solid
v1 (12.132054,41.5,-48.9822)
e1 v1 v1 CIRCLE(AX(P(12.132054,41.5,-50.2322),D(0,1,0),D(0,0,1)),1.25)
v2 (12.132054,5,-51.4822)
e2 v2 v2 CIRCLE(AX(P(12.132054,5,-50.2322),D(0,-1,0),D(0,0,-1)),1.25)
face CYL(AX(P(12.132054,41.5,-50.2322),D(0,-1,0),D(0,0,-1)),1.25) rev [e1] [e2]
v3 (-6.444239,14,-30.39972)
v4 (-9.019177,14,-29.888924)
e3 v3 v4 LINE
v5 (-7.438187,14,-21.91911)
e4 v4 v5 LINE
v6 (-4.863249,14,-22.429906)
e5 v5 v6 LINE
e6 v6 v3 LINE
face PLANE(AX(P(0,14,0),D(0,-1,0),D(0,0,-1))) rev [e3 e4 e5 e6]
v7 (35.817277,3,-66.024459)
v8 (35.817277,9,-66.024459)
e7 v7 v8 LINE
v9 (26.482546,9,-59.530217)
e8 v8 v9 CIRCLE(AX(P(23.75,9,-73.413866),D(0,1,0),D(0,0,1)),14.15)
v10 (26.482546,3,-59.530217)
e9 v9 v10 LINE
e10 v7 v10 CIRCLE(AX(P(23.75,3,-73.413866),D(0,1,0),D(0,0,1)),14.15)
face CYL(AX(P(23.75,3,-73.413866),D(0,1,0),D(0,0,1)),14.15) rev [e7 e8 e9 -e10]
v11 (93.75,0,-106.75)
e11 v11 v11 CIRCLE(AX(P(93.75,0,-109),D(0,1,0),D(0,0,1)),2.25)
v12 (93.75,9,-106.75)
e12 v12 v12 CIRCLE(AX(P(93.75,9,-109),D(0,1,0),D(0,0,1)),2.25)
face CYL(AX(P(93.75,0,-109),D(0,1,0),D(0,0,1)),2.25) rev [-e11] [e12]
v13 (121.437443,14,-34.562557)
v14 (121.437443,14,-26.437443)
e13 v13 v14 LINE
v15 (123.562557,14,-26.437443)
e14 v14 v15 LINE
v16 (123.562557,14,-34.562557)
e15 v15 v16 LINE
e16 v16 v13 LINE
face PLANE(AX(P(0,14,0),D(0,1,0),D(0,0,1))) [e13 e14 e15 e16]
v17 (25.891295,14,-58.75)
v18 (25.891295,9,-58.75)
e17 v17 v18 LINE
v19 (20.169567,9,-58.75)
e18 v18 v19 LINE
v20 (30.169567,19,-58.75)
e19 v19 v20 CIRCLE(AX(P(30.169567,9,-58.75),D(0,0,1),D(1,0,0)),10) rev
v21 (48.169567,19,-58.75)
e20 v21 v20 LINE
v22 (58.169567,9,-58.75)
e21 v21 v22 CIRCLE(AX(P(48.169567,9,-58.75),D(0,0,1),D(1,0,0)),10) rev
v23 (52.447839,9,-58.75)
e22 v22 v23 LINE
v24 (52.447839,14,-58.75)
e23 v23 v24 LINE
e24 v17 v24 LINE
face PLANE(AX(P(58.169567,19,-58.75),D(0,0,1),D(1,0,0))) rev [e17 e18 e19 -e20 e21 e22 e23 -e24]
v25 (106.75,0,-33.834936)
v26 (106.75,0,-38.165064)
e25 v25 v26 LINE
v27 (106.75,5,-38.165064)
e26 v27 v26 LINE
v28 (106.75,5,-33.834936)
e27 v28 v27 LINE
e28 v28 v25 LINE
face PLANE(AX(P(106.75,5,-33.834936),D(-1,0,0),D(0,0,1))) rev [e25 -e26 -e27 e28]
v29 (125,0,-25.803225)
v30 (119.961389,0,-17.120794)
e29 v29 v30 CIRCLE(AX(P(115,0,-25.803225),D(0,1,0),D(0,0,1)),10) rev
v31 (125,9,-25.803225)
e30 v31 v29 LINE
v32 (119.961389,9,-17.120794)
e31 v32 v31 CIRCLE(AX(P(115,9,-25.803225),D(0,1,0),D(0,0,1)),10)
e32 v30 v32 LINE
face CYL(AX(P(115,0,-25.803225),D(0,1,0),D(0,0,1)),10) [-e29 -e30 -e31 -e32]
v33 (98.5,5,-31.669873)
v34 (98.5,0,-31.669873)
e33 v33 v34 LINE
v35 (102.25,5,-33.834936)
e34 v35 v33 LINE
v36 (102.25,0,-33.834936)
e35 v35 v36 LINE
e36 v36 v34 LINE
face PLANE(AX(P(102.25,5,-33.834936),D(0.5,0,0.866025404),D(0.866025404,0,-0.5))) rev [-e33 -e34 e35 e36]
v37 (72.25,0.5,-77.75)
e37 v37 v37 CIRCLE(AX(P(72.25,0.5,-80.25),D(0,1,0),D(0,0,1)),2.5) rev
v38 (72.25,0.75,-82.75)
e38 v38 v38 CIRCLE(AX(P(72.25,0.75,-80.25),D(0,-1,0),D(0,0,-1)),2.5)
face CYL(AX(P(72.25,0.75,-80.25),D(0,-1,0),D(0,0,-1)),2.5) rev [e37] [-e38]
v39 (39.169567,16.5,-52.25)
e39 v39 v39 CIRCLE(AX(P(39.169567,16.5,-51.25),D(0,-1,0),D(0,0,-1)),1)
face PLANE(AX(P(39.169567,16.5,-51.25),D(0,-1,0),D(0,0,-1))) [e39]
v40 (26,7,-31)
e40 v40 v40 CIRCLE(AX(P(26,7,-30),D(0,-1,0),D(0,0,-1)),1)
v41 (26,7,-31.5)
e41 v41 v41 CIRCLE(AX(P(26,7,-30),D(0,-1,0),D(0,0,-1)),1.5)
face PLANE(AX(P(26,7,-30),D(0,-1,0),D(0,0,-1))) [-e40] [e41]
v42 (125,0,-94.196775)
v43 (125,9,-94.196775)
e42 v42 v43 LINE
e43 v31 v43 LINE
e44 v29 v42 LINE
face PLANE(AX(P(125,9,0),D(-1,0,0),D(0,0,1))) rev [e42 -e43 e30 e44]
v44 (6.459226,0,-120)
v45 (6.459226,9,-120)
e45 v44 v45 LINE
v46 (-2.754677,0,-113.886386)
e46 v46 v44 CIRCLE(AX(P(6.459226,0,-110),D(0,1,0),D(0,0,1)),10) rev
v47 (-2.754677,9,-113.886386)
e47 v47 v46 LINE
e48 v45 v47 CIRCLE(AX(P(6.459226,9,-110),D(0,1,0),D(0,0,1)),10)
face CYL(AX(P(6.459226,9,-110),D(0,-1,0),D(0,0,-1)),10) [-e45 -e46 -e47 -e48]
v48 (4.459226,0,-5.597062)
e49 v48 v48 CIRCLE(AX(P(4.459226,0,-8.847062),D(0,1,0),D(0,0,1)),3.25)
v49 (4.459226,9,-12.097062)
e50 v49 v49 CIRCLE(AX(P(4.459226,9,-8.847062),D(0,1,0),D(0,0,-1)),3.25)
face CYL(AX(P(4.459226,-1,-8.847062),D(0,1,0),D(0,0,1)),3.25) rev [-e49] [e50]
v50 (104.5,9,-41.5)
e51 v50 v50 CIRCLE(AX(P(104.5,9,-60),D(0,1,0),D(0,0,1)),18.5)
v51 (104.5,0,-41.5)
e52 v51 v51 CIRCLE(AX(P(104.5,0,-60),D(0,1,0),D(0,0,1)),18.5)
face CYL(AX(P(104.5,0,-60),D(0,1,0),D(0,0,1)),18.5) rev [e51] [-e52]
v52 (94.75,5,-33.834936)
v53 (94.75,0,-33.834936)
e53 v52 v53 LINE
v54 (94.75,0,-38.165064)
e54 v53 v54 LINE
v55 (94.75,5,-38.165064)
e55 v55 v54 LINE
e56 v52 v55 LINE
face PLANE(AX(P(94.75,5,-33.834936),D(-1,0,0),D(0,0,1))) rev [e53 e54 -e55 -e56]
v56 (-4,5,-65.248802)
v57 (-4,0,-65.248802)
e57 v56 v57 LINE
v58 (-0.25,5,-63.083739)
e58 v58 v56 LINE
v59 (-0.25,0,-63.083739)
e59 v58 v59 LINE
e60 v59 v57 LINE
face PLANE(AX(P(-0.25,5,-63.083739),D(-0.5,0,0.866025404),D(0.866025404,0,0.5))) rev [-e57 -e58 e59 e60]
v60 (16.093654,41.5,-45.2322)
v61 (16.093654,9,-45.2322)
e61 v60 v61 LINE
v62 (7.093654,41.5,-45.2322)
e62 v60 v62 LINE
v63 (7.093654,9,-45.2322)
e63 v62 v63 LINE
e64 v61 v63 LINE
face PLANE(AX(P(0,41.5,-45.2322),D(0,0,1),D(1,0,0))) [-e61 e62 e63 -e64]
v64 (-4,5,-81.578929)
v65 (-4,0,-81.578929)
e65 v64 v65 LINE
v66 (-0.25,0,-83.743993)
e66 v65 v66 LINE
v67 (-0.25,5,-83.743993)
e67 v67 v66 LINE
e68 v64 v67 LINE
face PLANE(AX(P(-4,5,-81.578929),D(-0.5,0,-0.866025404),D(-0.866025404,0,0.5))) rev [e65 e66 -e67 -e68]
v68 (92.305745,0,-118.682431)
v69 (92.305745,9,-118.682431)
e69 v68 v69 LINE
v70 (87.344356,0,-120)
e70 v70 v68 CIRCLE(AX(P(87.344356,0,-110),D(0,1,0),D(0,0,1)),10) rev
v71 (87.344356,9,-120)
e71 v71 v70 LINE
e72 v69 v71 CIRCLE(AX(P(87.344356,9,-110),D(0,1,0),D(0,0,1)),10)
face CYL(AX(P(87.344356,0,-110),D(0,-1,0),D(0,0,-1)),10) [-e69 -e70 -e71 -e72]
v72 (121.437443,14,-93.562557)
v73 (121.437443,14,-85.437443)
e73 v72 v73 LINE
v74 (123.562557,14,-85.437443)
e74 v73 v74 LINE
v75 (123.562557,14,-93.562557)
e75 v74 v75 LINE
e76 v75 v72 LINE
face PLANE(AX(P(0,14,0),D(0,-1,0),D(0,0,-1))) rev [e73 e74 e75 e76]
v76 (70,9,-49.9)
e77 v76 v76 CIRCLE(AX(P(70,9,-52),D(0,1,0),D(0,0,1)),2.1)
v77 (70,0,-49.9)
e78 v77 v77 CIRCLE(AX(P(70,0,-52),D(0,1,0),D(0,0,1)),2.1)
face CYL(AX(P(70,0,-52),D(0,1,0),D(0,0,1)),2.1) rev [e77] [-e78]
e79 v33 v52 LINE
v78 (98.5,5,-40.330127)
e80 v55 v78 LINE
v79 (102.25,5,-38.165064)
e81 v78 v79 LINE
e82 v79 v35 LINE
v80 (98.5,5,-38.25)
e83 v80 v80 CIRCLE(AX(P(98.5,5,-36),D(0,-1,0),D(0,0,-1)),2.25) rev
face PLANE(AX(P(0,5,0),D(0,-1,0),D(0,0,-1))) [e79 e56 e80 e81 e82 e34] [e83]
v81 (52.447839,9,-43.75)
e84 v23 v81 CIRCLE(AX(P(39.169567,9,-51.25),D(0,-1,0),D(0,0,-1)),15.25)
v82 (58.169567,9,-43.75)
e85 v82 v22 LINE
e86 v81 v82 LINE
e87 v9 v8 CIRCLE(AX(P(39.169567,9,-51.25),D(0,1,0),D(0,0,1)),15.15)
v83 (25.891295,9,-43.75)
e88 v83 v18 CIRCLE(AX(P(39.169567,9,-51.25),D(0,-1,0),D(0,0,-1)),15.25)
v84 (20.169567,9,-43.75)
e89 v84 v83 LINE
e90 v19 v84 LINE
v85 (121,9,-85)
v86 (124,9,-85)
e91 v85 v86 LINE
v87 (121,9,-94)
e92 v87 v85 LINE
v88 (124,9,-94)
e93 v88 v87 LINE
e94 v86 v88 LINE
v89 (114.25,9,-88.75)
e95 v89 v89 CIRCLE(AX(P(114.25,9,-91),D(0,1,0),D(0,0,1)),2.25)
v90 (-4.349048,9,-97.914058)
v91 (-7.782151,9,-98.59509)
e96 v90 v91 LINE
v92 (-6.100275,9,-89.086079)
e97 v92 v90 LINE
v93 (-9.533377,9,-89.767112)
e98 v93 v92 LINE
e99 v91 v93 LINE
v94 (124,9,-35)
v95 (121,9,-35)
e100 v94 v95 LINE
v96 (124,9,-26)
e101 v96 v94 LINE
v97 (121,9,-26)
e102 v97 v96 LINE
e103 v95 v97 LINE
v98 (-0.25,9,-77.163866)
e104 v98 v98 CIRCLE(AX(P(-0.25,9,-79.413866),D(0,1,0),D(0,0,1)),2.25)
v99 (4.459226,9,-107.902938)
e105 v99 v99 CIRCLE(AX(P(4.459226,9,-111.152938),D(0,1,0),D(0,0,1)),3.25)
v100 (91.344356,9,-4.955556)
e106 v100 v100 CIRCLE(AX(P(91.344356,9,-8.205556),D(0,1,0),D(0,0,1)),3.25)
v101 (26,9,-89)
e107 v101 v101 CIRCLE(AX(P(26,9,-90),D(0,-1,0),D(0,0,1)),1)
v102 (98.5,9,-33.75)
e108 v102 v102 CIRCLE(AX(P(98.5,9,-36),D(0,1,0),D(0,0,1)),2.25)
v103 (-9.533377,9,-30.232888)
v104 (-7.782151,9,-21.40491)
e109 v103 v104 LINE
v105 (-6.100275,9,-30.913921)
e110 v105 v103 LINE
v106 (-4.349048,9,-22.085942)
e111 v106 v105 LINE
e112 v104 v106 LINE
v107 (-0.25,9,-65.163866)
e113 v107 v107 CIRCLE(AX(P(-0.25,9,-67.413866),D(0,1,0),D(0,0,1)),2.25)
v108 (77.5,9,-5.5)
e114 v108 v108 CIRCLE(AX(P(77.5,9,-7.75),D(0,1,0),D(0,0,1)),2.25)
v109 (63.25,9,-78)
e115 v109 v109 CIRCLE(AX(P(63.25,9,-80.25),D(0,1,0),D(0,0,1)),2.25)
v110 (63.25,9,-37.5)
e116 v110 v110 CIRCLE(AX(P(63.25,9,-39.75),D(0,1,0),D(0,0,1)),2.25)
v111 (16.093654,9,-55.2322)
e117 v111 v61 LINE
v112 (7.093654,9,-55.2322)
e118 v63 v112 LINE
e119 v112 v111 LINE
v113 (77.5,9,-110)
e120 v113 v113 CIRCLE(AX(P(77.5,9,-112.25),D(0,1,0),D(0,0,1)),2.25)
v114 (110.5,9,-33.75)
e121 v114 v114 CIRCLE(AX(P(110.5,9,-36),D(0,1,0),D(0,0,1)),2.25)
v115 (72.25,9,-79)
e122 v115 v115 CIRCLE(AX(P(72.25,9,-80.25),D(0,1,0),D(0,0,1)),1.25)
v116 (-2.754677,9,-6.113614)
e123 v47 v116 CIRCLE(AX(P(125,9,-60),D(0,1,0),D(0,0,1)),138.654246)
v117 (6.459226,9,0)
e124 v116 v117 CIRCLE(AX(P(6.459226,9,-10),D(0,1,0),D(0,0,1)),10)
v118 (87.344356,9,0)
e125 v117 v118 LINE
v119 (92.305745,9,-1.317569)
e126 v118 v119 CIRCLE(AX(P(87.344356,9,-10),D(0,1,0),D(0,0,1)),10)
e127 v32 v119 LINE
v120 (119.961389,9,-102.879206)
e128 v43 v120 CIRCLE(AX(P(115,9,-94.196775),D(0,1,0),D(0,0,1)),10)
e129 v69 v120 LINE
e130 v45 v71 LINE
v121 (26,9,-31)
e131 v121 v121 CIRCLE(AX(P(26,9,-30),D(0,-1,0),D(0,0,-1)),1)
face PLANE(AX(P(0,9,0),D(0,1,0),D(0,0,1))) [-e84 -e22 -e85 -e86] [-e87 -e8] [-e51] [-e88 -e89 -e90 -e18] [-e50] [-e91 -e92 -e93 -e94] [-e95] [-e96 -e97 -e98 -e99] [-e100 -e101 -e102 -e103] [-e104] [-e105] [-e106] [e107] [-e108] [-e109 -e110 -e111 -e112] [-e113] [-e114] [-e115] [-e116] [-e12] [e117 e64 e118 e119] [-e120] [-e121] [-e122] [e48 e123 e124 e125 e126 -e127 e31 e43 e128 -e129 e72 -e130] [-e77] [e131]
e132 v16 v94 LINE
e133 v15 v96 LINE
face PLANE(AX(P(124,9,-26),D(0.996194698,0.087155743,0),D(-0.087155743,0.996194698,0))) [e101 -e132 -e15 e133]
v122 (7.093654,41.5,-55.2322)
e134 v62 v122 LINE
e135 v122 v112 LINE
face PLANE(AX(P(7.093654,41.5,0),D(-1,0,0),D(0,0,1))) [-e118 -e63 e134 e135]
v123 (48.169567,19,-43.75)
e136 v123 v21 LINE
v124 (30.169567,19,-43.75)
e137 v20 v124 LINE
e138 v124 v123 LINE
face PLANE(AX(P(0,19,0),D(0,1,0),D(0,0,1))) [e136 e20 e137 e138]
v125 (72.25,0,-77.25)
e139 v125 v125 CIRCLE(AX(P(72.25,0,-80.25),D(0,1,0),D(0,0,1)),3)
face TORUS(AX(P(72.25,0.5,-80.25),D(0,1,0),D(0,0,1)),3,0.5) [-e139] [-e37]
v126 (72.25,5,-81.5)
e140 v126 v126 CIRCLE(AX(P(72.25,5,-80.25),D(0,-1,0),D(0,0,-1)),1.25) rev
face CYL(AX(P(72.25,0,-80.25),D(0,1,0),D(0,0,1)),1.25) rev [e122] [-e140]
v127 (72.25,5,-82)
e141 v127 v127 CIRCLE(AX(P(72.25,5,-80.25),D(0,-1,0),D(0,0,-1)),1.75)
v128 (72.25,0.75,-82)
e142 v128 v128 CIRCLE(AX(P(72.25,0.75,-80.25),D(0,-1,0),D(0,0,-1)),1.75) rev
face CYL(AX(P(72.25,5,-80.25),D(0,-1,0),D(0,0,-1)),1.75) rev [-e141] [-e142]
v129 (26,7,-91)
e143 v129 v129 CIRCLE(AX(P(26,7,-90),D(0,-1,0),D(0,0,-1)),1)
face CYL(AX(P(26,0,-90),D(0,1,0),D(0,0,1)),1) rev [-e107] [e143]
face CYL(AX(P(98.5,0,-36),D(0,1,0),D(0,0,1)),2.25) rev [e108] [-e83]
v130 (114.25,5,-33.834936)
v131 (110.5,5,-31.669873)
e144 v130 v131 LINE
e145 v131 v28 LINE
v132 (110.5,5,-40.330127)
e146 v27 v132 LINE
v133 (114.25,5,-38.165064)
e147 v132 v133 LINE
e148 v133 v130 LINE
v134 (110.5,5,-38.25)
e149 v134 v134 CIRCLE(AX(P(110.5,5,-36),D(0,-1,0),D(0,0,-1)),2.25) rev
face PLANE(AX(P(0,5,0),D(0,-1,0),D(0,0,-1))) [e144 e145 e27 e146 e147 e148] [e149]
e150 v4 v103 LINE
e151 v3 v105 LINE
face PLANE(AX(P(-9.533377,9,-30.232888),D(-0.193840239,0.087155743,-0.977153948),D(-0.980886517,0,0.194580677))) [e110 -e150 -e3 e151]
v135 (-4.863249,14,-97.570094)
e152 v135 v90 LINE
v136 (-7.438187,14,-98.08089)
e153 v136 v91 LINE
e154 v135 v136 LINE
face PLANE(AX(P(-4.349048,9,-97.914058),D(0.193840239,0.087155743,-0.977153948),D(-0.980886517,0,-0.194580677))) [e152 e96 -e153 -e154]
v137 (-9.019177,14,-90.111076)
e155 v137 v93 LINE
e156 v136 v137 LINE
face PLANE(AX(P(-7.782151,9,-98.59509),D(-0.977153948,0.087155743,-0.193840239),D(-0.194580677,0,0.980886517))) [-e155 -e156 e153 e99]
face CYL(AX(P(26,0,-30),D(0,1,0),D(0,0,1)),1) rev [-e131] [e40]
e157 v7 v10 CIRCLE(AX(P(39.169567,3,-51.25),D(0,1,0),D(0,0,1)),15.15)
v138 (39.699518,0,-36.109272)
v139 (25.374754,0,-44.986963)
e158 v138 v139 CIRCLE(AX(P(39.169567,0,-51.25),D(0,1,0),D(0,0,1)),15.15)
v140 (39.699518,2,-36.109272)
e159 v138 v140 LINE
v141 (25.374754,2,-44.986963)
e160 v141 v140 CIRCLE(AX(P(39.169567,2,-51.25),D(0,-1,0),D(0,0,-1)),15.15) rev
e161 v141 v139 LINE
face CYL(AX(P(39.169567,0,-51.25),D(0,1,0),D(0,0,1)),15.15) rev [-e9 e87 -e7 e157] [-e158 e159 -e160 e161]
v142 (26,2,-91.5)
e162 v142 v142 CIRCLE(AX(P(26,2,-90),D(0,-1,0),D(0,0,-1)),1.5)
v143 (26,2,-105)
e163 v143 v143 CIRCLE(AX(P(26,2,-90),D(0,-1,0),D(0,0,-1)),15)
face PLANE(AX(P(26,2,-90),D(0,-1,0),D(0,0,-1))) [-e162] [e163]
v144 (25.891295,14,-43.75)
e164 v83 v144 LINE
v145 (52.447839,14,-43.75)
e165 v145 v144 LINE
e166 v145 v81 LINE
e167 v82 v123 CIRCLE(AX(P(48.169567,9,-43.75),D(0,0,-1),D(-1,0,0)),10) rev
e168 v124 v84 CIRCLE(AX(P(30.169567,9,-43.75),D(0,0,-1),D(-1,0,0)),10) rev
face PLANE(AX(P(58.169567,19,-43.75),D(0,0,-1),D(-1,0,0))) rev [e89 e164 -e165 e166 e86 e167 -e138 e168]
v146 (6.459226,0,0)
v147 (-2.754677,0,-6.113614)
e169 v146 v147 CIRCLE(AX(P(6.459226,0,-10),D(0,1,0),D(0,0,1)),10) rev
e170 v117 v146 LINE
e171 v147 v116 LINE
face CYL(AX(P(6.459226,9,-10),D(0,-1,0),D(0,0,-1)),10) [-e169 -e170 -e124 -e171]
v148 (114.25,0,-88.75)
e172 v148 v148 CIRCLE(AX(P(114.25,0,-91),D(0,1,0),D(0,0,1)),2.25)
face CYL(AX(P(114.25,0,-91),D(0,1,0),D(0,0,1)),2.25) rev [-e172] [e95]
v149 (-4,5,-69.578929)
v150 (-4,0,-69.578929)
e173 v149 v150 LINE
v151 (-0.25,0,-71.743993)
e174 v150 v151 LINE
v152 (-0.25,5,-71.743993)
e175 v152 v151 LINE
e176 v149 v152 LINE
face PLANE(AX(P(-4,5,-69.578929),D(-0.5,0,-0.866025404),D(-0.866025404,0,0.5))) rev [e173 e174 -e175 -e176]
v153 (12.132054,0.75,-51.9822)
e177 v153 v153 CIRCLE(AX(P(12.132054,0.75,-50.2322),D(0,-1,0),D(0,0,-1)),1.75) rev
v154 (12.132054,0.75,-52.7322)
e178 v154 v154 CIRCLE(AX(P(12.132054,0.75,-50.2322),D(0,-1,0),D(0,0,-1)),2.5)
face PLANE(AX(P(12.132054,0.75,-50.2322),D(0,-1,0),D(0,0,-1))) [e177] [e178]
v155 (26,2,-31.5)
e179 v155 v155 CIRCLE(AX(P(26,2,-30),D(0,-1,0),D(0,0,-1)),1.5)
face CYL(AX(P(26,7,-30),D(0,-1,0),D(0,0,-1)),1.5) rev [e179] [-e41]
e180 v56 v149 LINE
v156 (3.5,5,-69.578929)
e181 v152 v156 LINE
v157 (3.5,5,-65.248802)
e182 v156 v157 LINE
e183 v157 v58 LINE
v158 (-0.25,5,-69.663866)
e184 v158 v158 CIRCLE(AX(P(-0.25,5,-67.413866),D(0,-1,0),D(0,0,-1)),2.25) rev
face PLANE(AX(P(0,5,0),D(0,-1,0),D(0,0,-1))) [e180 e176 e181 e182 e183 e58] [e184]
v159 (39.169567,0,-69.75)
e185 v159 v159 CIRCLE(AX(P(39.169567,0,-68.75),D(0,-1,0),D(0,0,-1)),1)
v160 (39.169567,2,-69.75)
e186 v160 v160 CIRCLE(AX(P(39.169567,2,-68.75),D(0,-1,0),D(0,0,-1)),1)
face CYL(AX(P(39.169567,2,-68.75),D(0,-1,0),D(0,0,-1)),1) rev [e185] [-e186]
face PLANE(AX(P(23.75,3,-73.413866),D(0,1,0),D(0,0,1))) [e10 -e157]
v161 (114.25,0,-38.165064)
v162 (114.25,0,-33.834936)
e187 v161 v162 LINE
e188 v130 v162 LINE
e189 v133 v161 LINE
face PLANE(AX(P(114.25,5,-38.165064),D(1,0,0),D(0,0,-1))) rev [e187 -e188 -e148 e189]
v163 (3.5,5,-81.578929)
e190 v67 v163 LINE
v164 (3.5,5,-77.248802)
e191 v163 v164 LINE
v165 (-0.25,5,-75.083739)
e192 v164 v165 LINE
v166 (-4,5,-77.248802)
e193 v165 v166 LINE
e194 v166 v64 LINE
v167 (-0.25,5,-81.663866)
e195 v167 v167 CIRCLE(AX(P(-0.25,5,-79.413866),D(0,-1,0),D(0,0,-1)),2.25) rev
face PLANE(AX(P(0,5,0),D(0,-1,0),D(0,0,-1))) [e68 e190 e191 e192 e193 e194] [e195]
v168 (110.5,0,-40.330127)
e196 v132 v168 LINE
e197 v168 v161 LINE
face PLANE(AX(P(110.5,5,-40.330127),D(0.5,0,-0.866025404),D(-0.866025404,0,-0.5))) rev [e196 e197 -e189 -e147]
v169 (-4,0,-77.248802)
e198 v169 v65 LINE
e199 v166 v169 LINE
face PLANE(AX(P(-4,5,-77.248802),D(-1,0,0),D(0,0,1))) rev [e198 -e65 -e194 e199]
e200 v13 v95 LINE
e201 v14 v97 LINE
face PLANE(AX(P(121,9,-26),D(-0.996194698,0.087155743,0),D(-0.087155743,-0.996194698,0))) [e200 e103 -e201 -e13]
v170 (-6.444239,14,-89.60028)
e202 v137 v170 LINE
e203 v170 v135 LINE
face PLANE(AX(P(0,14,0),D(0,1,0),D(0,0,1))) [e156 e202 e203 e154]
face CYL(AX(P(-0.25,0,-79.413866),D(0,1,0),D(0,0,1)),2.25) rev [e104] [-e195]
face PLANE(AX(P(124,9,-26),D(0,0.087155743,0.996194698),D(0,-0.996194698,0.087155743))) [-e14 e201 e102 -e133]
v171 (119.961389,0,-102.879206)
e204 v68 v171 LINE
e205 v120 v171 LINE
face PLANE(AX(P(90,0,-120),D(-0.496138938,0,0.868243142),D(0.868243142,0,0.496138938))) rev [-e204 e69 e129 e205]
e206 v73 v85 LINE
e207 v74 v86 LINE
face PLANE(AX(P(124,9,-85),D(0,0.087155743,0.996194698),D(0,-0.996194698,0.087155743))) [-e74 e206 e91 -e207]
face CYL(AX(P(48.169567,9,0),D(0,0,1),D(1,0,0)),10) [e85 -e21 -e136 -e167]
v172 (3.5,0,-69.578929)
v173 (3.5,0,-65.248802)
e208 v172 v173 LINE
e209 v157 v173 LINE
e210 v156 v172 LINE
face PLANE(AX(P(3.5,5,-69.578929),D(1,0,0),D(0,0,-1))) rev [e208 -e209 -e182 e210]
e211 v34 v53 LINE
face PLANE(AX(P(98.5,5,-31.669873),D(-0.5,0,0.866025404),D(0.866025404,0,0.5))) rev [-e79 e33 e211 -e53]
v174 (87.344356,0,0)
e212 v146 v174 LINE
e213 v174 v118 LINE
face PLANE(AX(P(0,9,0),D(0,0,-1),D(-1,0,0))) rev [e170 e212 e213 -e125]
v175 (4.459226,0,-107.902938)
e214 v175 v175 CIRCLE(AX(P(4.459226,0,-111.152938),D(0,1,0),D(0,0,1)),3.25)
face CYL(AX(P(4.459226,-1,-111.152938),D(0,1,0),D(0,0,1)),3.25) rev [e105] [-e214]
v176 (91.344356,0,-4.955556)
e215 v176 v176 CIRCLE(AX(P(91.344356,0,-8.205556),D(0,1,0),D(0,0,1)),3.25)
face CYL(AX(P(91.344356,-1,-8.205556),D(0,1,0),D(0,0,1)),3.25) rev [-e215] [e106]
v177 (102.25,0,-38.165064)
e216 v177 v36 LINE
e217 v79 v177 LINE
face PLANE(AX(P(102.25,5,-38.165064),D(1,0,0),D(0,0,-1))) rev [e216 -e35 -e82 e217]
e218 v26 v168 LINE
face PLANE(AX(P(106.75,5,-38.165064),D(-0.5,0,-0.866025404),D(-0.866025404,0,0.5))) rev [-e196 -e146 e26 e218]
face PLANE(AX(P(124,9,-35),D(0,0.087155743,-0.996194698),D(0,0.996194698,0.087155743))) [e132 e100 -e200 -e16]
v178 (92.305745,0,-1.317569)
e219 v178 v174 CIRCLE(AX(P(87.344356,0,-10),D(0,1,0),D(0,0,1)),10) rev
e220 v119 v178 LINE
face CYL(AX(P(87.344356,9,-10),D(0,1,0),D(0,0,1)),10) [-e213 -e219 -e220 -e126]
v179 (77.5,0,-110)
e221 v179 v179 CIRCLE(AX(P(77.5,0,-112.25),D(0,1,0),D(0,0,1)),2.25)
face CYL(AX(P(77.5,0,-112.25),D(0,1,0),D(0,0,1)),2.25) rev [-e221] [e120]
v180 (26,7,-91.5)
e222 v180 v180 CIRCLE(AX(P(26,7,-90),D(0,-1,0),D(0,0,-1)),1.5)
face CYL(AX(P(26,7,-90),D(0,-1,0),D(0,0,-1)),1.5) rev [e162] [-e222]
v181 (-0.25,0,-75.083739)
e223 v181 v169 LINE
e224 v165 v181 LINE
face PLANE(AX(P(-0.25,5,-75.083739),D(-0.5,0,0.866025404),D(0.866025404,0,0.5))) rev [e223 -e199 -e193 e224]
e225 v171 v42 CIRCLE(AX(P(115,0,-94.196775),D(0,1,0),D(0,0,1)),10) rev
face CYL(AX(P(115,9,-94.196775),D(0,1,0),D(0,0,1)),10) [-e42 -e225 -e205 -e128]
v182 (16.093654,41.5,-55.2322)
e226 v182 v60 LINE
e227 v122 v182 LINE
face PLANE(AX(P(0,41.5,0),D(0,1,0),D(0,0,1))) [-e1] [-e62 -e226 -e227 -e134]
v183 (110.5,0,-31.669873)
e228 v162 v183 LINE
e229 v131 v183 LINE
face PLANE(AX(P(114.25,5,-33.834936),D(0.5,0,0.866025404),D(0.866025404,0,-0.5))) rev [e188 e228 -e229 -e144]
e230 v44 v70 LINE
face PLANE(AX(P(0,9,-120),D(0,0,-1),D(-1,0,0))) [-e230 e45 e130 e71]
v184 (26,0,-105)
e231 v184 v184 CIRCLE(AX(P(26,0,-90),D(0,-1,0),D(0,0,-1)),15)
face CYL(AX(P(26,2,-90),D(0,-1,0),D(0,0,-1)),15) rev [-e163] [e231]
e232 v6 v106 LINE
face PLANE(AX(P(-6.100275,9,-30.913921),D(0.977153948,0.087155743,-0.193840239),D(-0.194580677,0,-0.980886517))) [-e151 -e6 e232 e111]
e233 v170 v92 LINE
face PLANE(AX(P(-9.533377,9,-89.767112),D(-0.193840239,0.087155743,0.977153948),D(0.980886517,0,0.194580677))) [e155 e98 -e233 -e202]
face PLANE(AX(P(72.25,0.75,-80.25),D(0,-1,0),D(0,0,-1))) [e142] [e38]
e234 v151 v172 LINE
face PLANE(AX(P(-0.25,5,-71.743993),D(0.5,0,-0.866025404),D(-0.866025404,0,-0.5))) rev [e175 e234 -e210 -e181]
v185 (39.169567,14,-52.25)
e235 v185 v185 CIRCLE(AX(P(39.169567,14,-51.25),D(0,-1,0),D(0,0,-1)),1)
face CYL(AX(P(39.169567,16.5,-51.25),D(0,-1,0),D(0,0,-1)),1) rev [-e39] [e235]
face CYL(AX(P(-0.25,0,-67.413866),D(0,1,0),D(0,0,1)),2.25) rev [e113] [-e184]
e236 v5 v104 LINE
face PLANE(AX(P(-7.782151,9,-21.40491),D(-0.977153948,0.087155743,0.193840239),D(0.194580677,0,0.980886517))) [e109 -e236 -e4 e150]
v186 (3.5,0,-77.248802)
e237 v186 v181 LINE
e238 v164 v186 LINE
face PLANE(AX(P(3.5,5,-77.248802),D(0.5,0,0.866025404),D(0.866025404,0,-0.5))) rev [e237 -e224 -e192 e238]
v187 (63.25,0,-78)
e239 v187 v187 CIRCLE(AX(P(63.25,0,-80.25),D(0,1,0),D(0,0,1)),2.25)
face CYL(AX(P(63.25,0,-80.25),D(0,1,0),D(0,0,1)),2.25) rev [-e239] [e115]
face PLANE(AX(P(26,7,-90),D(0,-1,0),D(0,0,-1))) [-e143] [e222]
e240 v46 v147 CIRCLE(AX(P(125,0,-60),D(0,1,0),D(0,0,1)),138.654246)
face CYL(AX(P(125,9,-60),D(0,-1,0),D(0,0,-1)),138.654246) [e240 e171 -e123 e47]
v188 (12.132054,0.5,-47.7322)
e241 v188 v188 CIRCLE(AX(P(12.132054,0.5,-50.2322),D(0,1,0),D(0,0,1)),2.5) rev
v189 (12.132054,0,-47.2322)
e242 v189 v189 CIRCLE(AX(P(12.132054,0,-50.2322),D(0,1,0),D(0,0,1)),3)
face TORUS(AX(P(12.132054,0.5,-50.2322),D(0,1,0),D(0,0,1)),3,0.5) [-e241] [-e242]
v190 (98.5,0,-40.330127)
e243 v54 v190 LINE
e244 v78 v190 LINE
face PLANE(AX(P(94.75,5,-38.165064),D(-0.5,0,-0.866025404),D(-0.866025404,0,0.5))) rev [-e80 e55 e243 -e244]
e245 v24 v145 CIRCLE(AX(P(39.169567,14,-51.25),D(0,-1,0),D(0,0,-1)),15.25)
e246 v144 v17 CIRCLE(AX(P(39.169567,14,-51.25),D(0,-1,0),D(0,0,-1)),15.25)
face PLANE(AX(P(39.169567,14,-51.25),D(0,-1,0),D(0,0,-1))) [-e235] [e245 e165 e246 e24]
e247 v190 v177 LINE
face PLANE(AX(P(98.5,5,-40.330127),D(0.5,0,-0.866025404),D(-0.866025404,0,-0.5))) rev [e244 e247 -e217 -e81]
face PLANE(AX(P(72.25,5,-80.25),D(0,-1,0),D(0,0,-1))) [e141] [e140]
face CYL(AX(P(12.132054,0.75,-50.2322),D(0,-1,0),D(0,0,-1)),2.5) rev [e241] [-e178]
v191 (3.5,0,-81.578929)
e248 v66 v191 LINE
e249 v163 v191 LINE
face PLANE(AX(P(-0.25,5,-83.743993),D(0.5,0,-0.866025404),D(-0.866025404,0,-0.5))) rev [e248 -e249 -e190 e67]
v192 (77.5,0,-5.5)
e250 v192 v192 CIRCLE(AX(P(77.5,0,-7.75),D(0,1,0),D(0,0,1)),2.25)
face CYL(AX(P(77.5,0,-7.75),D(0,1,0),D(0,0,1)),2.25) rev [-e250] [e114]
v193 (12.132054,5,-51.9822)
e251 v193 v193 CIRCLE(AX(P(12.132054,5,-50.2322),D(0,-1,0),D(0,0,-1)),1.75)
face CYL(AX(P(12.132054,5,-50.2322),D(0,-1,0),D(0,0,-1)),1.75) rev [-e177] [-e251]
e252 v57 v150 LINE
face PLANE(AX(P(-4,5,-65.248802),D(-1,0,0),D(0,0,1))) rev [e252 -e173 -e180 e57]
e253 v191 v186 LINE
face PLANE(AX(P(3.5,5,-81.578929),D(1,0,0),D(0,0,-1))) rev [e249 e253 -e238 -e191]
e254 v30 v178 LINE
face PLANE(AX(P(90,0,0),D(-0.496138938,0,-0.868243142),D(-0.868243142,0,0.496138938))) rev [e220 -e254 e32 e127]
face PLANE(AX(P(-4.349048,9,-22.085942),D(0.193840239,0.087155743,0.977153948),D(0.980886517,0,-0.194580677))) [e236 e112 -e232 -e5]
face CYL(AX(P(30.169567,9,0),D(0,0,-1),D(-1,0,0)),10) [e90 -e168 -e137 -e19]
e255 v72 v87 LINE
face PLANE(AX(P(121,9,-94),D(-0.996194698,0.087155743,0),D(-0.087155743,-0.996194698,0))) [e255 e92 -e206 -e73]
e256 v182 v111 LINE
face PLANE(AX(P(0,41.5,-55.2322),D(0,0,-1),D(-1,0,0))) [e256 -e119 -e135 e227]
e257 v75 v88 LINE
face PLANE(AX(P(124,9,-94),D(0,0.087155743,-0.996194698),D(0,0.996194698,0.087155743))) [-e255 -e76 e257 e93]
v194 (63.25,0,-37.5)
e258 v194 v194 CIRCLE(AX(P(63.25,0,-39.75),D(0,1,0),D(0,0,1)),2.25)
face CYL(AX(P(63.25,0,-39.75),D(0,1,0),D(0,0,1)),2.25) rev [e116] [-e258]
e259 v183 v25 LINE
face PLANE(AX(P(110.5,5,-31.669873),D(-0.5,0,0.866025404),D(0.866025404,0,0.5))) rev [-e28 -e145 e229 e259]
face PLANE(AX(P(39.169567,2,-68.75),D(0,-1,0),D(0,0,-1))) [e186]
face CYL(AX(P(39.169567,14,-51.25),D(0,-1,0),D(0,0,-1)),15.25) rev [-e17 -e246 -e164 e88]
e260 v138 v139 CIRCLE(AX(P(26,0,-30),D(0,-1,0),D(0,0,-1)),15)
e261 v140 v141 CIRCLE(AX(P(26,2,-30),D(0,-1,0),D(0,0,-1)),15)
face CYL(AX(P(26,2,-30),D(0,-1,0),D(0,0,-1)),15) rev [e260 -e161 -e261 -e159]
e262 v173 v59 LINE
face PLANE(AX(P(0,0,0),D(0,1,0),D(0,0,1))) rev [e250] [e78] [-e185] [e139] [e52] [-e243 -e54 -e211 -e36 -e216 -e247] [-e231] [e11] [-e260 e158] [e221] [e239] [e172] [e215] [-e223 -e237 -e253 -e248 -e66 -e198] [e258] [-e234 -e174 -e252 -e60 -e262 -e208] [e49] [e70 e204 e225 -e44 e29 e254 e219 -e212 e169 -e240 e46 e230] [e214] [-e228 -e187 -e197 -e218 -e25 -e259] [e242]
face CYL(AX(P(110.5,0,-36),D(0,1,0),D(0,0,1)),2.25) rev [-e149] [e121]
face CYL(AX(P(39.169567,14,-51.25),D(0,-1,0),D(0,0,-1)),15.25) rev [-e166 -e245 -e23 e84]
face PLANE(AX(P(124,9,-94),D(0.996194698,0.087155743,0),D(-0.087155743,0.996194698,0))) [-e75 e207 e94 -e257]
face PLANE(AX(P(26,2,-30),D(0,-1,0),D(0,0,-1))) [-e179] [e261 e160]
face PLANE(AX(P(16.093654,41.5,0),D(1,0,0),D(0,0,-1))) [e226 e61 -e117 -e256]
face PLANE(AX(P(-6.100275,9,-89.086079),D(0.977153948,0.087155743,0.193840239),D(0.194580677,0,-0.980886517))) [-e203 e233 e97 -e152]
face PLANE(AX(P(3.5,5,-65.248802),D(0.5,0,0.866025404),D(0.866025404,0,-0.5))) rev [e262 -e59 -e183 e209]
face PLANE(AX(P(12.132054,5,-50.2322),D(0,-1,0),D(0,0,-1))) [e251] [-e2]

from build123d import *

# Parameters (mm, degrees)
SKETCH1_W                         = 125
SKETCH1_H                         = 120
TOP_BASE_DEPTH                    = 9
SKETCH5_R                         = 14.15
DRIVE_GEAR_HOLE_DEPTH             = 6
SKETCH28_R                        = 15.15
TWO_STAGE_GEAR_HOLE_DEPTH         = 174.51080658
SKETCH8_R                         = 18.5
XL320_FINGER_KNUCKLE_MOUNT_DEPTH  = 174.51080658
SKETCH26_R                        = 1
STRING_HOLES_DEPTH                = 174.51080658
XL320_MOUNT_HOLES_R               = 2.25
XL320_MOUNT_HOLES_M4_DEPTH        = 174.51080658
AX12_MOUNT_HOLES_R                = 2.25
AX12_MOUNT_HOLES_M4_DEPTH         = 174.51080658
NUTS_M4_DEPTH                     = 5
SKETCH34_R                        = 15
HOLES_FOR_M4_IN_FINGER_GEAR_DEPTH = 2
SKETCH31_W                        = 38
SKETCH31_H                        = 15
BOSS_EXTRUDE1_DEPTH               = 10
SKETCH32_R                        = 15.25
CUT_EXTRUDE5_DEPTH                = 5
SKETCH33_R                        = 1
CUT_EXTRUDE6_DEPTH                = 2.5
FILLET2_R                         = 10
CUT_EXTRUDE8_DEPTH                = 174.565549577
FILLET4_R                         = 10
SKETCH37_R                        = 3.25
CONNECT_HOLES_M6_DEPTH            = 10
SKETCH41_R                        = 2.1
CONNECT_TO_HOUSE_M4_DEPTH         = 174.565549577
SKETCH42_W                        = 3
SKETCH42_H                        = 9
HOUSING_FITS_DEPTH                = 5
HOUSING_FITS_DRAFT                = 5
HOUSING_FITS_PROFILE_2_DEPTH      = 5
HOUSING_FITS_PROFILE_2_DRAFT      = 5
HOUSING_FITS_PROFILE_3_DEPTH      = 5
HOUSING_FITS_PROFILE_3_DRAFT      = 5
HOUSING_FITS_PROFILE_4_DEPTH      = 5
HOUSING_FITS_PROFILE_4_DRAFT      = 5
SKETCH43_R                        = 1
M2_SHAFT_HOLE_DEPTH               = 2
SKETCH54_R                        = 1.5
HOLLOW_SHAFT_HOLE_DEPTH           = 5
SKETCH46_R                        = 1.25
CUT_EXTRUDE11_DEPTH               = 174.565549577
SKETCH47_R                        = 1.75
CUT_EXTRUDE12_DEPTH               = 5
SKETCH48_R                        = 2.5
CUT_EXTRUDE13_DEPTH               = 0.75
SKETCH49_R                        = 1.25
BOSS_EXTRUDE2_DEPTH               = 32.5
SKETCH51_R                        = 1.25
CUT_EXTRUDE14_DEPTH               = 177.298752123
SKETCH52_R                        = 1.75
CUT_EXTRUDE15_DEPTH               = 5
SKETCH53_R                        = 2.5
CUT_EXTRUDE16_DEPTH               = 0.75
FILLET5_R                         = 0.5


with BuildPart() as part:
    # Sketch1 → Top_Base (new body)
    with BuildSketch(Plane(origin=(0, 0, 0), x_dir=(1, 0, 0), z_dir=(0, 1, 0))):
        with BuildLine():
            ThreePointArc((0, 120), (-13.654246239, 60), (0, 0))
            Line((0, 0), (0, 120))
        make_face()
        with Locations((62.5, 60)):
            Rectangle(SKETCH1_W, SKETCH1_H)
    extrude(amount=TOP_BASE_DEPTH)

    # Sketch5 → Drive_Gear_Hole (cut)
    with BuildSketch(Plane(origin=(0, 9, 0), x_dir=(1, 0, 0), z_dir=(0, 1, 0))):
        with Locations(Location((23.75, 73.41386581, 0), (0, 0, 270))):
            Circle(SKETCH5_R)
    extrude(amount=-DRIVE_GEAR_HOLE_DEPTH, mode=Mode.SUBTRACT)

    # Sketch28 → Two_Stage_Gear_Hole (cut, through all)
    with BuildSketch(Plane(origin=(0, 9, 0), x_dir=(1, 0, 0), z_dir=(0, 1, 0))):
        with Locations(Location((39.169567191, 51.25, 0), (0, 0, 270))):
            Circle(SKETCH28_R)
    extrude(amount=-TWO_STAGE_GEAR_HOLE_DEPTH, mode=Mode.SUBTRACT)

    # Sketch8 → XL320_Finger_Knuckle_Mount (cut, through all)
    with BuildSketch(Plane(origin=(0, 9, 0), x_dir=(1, 0, 0), z_dir=(0, 1, 0))):
        with Locations(Location((104.5, 60, 0), (0, 0, 270))):
            Circle(SKETCH8_R)
    extrude(amount=-XL320_FINGER_KNUCKLE_MOUNT_DEPTH, mode=Mode.SUBTRACT)

    # Sketch26 → String_Holes (cut, through all)
    with BuildSketch(Plane.XZ.offset(-9)):
        with Locations(Location((26, -30, 0), (0, 0, 270))):
            Circle(SKETCH26_R)
        with Locations(Location((26, -90, 0), (0, 0, 90))):
            Circle(SKETCH26_R)
    extrude(amount=STRING_HOLES_DEPTH, mode=Mode.SUBTRACT)

    # XL320_Mount_Holes → XL320_Mount_Holes_(M4) (cut, through all)
    with BuildSketch(Plane(origin=(0, 9, 0), x_dir=(1, 0, 0), z_dir=(0, 1, 0))):
        with Locations(Location((110.5, 36, 0), (0, 0, 270))):
            Circle(XL320_MOUNT_HOLES_R)
        with Locations(Location((98.5, 36, 0), (0, 0, 270))):
            Circle(XL320_MOUNT_HOLES_R)
        with Locations(Location((-0.25, 79.41386581, 0), (0, 0, 270))):
            Circle(XL320_MOUNT_HOLES_R)
        with Locations(Location((-0.25, 67.41386581, 0), (0, 0, 270))):
            Circle(XL320_MOUNT_HOLES_R)
    extrude(amount=-XL320_MOUNT_HOLES_M4_DEPTH, mode=Mode.SUBTRACT)

    # AX12_Mount_Holes → AX12_Mount_Holes_(M4) (cut, through all)
    with BuildSketch(Plane(origin=(0, 9, 0), x_dir=(1, 0, 0), z_dir=(0, 1, 0))):
        with Locations(Location((77.5, 112.25, 0), (0, 0, 270))):
            Circle(AX12_MOUNT_HOLES_R)
        with Locations(Location((63.25, 80.25, 0), (0, 0, 270))):
            Circle(AX12_MOUNT_HOLES_R)
        with Locations(Location((114.25, 91, 0), (0, 0, 270))):
            Circle(AX12_MOUNT_HOLES_R)
        with Locations(Location((93.75, 109, 0), (0, 0, 270))):
            Circle(AX12_MOUNT_HOLES_R)
        with Locations(Location((63.25, 39.75, 0), (0, 0, 270))):
            Circle(AX12_MOUNT_HOLES_R)
        with Locations(Location((77.5, 7.75, 0), (0, 0, 270))):
            Circle(AX12_MOUNT_HOLES_R)
    extrude(amount=-AX12_MOUNT_HOLES_M4_DEPTH, mode=Mode.SUBTRACT)

    # Sketch27 → Nuts_(M4) (cut)
    with BuildSketch(Plane.XZ):
        Polygon((110.5, -31.669872981), (106.75, -33.834936491), (106.75, -38.165063509), (110.5, -40.330127019), (114.25, -38.165063509), (114.25, -33.834936491), align=None)
        Polygon((98.5, -31.669872981), (94.75, -33.834936491), (94.75, -38.165063509), (98.5, -40.330127019), (102.25, -38.165063509), (102.25, -33.834936491), align=None)
        Polygon((3.5, -65.2488023), (-0.25, -63.083738791), (-4, -65.2488023), (-4, -69.578929319), (-0.25, -71.743992829), (3.5, -69.578929319), align=None)
        Polygon((-4, -77.2488023), (-4, -81.578929319), (-0.25, -83.743992829), (3.5, -81.578929319), (3.5, -77.2488023), (-0.25, -75.083738791), align=None)
    extrude(amount=-NUTS_M4_DEPTH, mode=Mode.SUBTRACT)

    # Sketch34 → Holes_For_M4_In_Finger_Gear (cut)
    with BuildSketch(Plane.XZ):
        with Locations((26, -30)):
            Circle(SKETCH34_R)
        with Locations(Location((26, -90, 0), (0, 0, 270))):
            Circle(SKETCH34_R)
    extrude(amount=-HOLES_FOR_M4_IN_FINGER_GEAR_DEPTH, mode=Mode.SUBTRACT)

    # Sketch31 → Boss-Extrude1 (add)
    with BuildSketch(Plane(origin=(0, 9, 0), x_dir=(1, 0, 0), z_dir=(0, 1, 0))):
        with Locations((39.169567191, 51.25)):
            Rectangle(SKETCH31_W, SKETCH31_H)
    extrude(amount=BOSS_EXTRUDE1_DEPTH)

    # Sketch32 → Cut-Extrude5 (cut)
    with BuildSketch(Plane.XZ.offset(-9)):
        with Locations((39.169567191, -51.25)):
            Circle(SKETCH32_R)
    extrude(amount=-CUT_EXTRUDE5_DEPTH, mode=Mode.SUBTRACT)

    # Sketch33 → Cut-Extrude6 (cut)
    with BuildSketch(Plane.XZ.offset(-14)):
        with Locations(Location((39.169567191, -51.25, 0), (0, 0, 270))):
            Circle(SKETCH33_R)
    extrude(amount=-CUT_EXTRUDE6_DEPTH, mode=Mode.SUBTRACT)

    # Fillet2
    fillet2_edges = [part.edges().sort_by_distance(p)[0] for p in [
        (58.169567191, 19, -51.25),
        (20.169567191, 19, -51.25),
    ]]
    fillet(fillet2_edges, radius=FILLET2_R - 0.0001)  # a hair under: the kernel refuses the full size

    # Sketch36 → Cut-Extrude8 (cut, through all)
    with BuildSketch(Plane(origin=(0, 9, 0), x_dir=(1, 0, 0), z_dir=(0, 1, 0))):
        Polygon((90, 120), (125, 100), (125, 120), align=None)
        Polygon((125, 0), (90, 0), (125, 20), align=None)
    extrude(amount=-CUT_EXTRUDE8_DEPTH, mode=Mode.SUBTRACT)

    # Fillet4
    fillet4_edges = [part.edges().sort_by_distance(p)[0] for p in [
        (90, 4.5, -120),
        (125, 4.5, -100),
        (125, 4.5, -20),
        (90, 4.5, 0),
        (0, 4.5, -120),
        (0, 4.5, 0),
    ]]
    fillet(fillet4_edges, radius=FILLET4_R)

    # Sketch37 → Connect_Holes_(M6) (cut)
    with BuildSketch(Plane(origin=(0, 9, 0), x_dir=(1, 0, 0), z_dir=(0, 1, 0))):
        with Locations(Location((4.459226107, 111.152938298, 0), (0, 0, 270))):
            Circle(SKETCH37_R)
        with Locations(Location((4.459226107, 8.847061702, 0), (0, 0, 270))):
            Circle(SKETCH37_R)
        with Locations(Location((91.344355629, 8.205555711, 0), (0, 0, 270))):
            Circle(SKETCH37_R)
    extrude(amount=-CONNECT_HOLES_M6_DEPTH, mode=Mode.SUBTRACT)

    # Sketch41 → Connect_To_House_(M4) (cut, through all)
    with BuildSketch(Plane(origin=(0, 9, 0), x_dir=(1, 0, 0), z_dir=(0, 1, 0))):
        with Locations(Location((70, 52, 0), (0, 0, 270))):
            Circle(SKETCH41_R)
    extrude(amount=-CONNECT_TO_HOUSE_M4_DEPTH, mode=Mode.SUBTRACT)


with BuildPart() as housing_fits_tool:
    # Sketch42 → Housing_Fits (with draft: the straight prism first)
    with BuildSketch(Plane(origin=(0, 9, 0), x_dir=(1, 0, 0), z_dir=(0, 1, 0))):
        with Locations((122.5, 30.5)):
            Rectangle(SKETCH42_W, SKETCH42_H)
    extrude(amount=HOUSING_FITS_DEPTH)
    # Housing_Fits: the draft: its side faces are tilted about the plane it starts from
    housing_fits_sides = [housing_fits_tool.faces().sort_by_distance(p)[0] for p in [
        (124, 11.5, -30.5),
        (122.5, 11.5, -35),
        (121, 11.5, -30.5),
        (122.5, 11.5, -26),
    ]]
    draft(housing_fits_sides, Plane(origin=(0, 9, 0), x_dir=(1, 0, 0), z_dir=(0, 1, 0)), HOUSING_FITS_DRAFT)


with BuildPart() as part_1:
    add(part.part)

    # Housing_Fits: add housing_fits_tool
    add(housing_fits_tool.part)


with BuildPart() as housing_fits_profile_2_tool:
    # Sketch42 → Housing_Fits profile 2 (with draft: the straight prism first)
    with BuildSketch(Plane(origin=(0, 9, 0), x_dir=(1, 0, 0), z_dir=(0, 1, 0))):
        Polygon((-9.533377338, 30.232888291), (-7.782151246, 21.404909633), (-4.349048435, 22.085942002), (-6.100274527, 30.91392066), align=None)
    extrude(amount=HOUSING_FITS_PROFILE_2_DEPTH)
    # Housing_Fits profile 2: the draft: its side faces are tilted about the plane it starts from
    housing_fits_profile_2_sides = [housing_fits_profile_2_tool.faces().sort_by_distance(p)[0] for p in [
        (-8.657764292, 11.5, -25.818898962),
        (-6.065599841, 11.5, -21.745425818),
        (-5.224661481, 11.5, -26.499931331),
        (-7.816825933, 11.5, -30.573404475),
    ]]
    draft(housing_fits_profile_2_sides, Plane(origin=(0, 9, 0), x_dir=(1, 0, 0), z_dir=(0, 1, 0)), HOUSING_FITS_PROFILE_2_DRAFT)


with BuildPart() as part_2:
    add(part_1.part)

    # Housing_Fits profile 2: add housing_fits_profile_2_tool
    add(housing_fits_profile_2_tool.part)


with BuildPart() as housing_fits_profile_3_tool:
    # Sketch42 → Housing_Fits profile 3 (with draft: the straight prism first)
    with BuildSketch(Plane(origin=(0, 9, 0), x_dir=(1, 0, 0), z_dir=(0, 1, 0))):
        Polygon((-4.349048435, 97.914057998), (-7.782151246, 98.595090367), (-9.533377338, 89.767111709), (-6.100274527, 89.08607934), align=None)
    extrude(amount=HOUSING_FITS_PROFILE_3_DEPTH)
    # Housing_Fits profile 3: the draft: its side faces are tilted about the plane it starts from
    housing_fits_profile_3_sides = [housing_fits_profile_3_tool.faces().sort_by_distance(p)[0] for p in [
        (-6.065599841, 11.5, -98.254574182),
        (-8.657764292, 11.5, -94.181101038),
        (-7.816825933, 11.5, -89.426595525),
        (-5.224661481, 11.5, -93.500068669),
    ]]
    draft(housing_fits_profile_3_sides, Plane(origin=(0, 9, 0), x_dir=(1, 0, 0), z_dir=(0, 1, 0)), HOUSING_FITS_PROFILE_3_DRAFT)


with BuildPart() as part_3:
    add(part_2.part)

    # Housing_Fits profile 3: add housing_fits_profile_3_tool
    add(housing_fits_profile_3_tool.part)


with BuildPart() as housing_fits_profile_4_tool:
    # Sketch42 → Housing_Fits profile 4 (with draft: the straight prism first)
    with BuildSketch(Plane(origin=(0, 9, 0), x_dir=(1, 0, 0), z_dir=(0, 1, 0))):
        with Locations((122.5, 89.5)):
            Rectangle(SKETCH42_W, SKETCH42_H)
    extrude(amount=HOUSING_FITS_PROFILE_4_DEPTH)
    # Housing_Fits profile 4: the draft: its side faces are tilted about the plane it starts from
    housing_fits_profile_4_sides = [housing_fits_profile_4_tool.faces().sort_by_distance(p)[0] for p in [
        (122.5, 11.5, -94),
        (121, 11.5, -89.5),
        (122.5, 11.5, -85),
        (124, 11.5, -89.5),
    ]]
    draft(housing_fits_profile_4_sides, Plane(origin=(0, 9, 0), x_dir=(1, 0, 0), z_dir=(0, 1, 0)), HOUSING_FITS_PROFILE_4_DRAFT)


with BuildPart() as part_4:
    add(part_3.part)

    # Housing_Fits profile 4: add housing_fits_profile_4_tool
    add(housing_fits_profile_4_tool.part)

    # Sketch43 → M2_Shaft_Hole (cut)
    with BuildSketch(Plane.XZ):
        with Locations(Location((39.169567191, -68.75, 0), (0, 0, 270))):
            Circle(SKETCH43_R)
    extrude(amount=-M2_SHAFT_HOLE_DEPTH, mode=Mode.SUBTRACT)

    # Sketch54 → Hollow_Shaft_Hole (cut)
    with BuildSketch(Plane.XZ.offset(-2)):
        with Locations(Location((26, -30, 0), (0, 0, 270))):
            Circle(SKETCH54_R)
        with Locations(Location((26, -90, 0), (0, 0, 270))):
            Circle(SKETCH54_R)
    extrude(amount=-HOLLOW_SHAFT_HOLE_DEPTH, mode=Mode.SUBTRACT)

    # Sketch46 → Cut-Extrude11 (cut, through all)
    with BuildSketch(Plane(origin=(0, 9, 0), x_dir=(1, 0, 0), z_dir=(0, 1, 0))):
        with Locations(Location((72.25, 80.25, 0), (0, 0, 270))):
            Circle(SKETCH46_R)
    extrude(amount=-CUT_EXTRUDE11_DEPTH, mode=Mode.SUBTRACT)

    # Sketch47 → Cut-Extrude12 (cut)
    with BuildSketch(Plane.XZ):
        with Locations(Location((72.25, -80.25, 0), (0, 0, 270))):
            Circle(SKETCH47_R)
    extrude(amount=-CUT_EXTRUDE12_DEPTH, mode=Mode.SUBTRACT)

    # Sketch48 → Cut-Extrude13 (cut)
    with BuildSketch(Plane.XZ):
        with Locations(Location((72.25, -80.25, 0), (0, 0, 270))):
            Circle(SKETCH48_R)
    extrude(amount=-CUT_EXTRUDE13_DEPTH, mode=Mode.SUBTRACT)

    # Sketch49 → Boss-Extrude2 (add)
    with BuildSketch(Plane(origin=(0, 9, 0), x_dir=(1, 0, 0), z_dir=(0, 1, 0))):
        Polygon((16.093653761, 45.2322), (12.132053761, 45.2322), (7.093653761, 45.2322), (7.093653761, 55.2322), (12.132053761, 55.2322), (16.093653761, 55.2322), align=None)
        with Locations(Location((12.132053761, 50.2322, 0), (0, 0, 270))):
            Circle(SKETCH49_R, mode=Mode.SUBTRACT)
    extrude(amount=BOSS_EXTRUDE2_DEPTH)

    # Sketch51 → Cut-Extrude14 (cut, through all)
    with BuildSketch(Plane(origin=(0, 9, 0), x_dir=(1, 0, 0), z_dir=(0, 1, 0))):
        with Locations(Location((12.132053761, 50.2322, 0), (0, 0, 270))):
            Circle(SKETCH51_R)
    extrude(amount=-CUT_EXTRUDE14_DEPTH, mode=Mode.SUBTRACT)

    # Sketch52 → Cut-Extrude15 (cut)
    with BuildSketch(Plane.XZ):
        with Locations(Location((12.132053761, -50.2322, 0), (0, 0, 270))):
            Circle(SKETCH52_R)
    extrude(amount=-CUT_EXTRUDE15_DEPTH, mode=Mode.SUBTRACT)

    # Sketch53 → Cut-Extrude16 (cut)
    with BuildSketch(Plane.XZ):
        with Locations(Location((12.132053761, -50.2322, 0), (0, 0, 270))):
            Circle(SKETCH53_R)
    extrude(amount=-CUT_EXTRUDE16_DEPTH, mode=Mode.SUBTRACT)

    # Fillet5
    fillet5_edges = [part_4.edges().sort_by_distance(p)[0] for p in [
        (72.25, 0, -77.75),
        (12.132053761, 0, -47.7322),
    ]]
    fillet(fillet5_edges, radius=FILLET5_R)


solid = part_4.part
